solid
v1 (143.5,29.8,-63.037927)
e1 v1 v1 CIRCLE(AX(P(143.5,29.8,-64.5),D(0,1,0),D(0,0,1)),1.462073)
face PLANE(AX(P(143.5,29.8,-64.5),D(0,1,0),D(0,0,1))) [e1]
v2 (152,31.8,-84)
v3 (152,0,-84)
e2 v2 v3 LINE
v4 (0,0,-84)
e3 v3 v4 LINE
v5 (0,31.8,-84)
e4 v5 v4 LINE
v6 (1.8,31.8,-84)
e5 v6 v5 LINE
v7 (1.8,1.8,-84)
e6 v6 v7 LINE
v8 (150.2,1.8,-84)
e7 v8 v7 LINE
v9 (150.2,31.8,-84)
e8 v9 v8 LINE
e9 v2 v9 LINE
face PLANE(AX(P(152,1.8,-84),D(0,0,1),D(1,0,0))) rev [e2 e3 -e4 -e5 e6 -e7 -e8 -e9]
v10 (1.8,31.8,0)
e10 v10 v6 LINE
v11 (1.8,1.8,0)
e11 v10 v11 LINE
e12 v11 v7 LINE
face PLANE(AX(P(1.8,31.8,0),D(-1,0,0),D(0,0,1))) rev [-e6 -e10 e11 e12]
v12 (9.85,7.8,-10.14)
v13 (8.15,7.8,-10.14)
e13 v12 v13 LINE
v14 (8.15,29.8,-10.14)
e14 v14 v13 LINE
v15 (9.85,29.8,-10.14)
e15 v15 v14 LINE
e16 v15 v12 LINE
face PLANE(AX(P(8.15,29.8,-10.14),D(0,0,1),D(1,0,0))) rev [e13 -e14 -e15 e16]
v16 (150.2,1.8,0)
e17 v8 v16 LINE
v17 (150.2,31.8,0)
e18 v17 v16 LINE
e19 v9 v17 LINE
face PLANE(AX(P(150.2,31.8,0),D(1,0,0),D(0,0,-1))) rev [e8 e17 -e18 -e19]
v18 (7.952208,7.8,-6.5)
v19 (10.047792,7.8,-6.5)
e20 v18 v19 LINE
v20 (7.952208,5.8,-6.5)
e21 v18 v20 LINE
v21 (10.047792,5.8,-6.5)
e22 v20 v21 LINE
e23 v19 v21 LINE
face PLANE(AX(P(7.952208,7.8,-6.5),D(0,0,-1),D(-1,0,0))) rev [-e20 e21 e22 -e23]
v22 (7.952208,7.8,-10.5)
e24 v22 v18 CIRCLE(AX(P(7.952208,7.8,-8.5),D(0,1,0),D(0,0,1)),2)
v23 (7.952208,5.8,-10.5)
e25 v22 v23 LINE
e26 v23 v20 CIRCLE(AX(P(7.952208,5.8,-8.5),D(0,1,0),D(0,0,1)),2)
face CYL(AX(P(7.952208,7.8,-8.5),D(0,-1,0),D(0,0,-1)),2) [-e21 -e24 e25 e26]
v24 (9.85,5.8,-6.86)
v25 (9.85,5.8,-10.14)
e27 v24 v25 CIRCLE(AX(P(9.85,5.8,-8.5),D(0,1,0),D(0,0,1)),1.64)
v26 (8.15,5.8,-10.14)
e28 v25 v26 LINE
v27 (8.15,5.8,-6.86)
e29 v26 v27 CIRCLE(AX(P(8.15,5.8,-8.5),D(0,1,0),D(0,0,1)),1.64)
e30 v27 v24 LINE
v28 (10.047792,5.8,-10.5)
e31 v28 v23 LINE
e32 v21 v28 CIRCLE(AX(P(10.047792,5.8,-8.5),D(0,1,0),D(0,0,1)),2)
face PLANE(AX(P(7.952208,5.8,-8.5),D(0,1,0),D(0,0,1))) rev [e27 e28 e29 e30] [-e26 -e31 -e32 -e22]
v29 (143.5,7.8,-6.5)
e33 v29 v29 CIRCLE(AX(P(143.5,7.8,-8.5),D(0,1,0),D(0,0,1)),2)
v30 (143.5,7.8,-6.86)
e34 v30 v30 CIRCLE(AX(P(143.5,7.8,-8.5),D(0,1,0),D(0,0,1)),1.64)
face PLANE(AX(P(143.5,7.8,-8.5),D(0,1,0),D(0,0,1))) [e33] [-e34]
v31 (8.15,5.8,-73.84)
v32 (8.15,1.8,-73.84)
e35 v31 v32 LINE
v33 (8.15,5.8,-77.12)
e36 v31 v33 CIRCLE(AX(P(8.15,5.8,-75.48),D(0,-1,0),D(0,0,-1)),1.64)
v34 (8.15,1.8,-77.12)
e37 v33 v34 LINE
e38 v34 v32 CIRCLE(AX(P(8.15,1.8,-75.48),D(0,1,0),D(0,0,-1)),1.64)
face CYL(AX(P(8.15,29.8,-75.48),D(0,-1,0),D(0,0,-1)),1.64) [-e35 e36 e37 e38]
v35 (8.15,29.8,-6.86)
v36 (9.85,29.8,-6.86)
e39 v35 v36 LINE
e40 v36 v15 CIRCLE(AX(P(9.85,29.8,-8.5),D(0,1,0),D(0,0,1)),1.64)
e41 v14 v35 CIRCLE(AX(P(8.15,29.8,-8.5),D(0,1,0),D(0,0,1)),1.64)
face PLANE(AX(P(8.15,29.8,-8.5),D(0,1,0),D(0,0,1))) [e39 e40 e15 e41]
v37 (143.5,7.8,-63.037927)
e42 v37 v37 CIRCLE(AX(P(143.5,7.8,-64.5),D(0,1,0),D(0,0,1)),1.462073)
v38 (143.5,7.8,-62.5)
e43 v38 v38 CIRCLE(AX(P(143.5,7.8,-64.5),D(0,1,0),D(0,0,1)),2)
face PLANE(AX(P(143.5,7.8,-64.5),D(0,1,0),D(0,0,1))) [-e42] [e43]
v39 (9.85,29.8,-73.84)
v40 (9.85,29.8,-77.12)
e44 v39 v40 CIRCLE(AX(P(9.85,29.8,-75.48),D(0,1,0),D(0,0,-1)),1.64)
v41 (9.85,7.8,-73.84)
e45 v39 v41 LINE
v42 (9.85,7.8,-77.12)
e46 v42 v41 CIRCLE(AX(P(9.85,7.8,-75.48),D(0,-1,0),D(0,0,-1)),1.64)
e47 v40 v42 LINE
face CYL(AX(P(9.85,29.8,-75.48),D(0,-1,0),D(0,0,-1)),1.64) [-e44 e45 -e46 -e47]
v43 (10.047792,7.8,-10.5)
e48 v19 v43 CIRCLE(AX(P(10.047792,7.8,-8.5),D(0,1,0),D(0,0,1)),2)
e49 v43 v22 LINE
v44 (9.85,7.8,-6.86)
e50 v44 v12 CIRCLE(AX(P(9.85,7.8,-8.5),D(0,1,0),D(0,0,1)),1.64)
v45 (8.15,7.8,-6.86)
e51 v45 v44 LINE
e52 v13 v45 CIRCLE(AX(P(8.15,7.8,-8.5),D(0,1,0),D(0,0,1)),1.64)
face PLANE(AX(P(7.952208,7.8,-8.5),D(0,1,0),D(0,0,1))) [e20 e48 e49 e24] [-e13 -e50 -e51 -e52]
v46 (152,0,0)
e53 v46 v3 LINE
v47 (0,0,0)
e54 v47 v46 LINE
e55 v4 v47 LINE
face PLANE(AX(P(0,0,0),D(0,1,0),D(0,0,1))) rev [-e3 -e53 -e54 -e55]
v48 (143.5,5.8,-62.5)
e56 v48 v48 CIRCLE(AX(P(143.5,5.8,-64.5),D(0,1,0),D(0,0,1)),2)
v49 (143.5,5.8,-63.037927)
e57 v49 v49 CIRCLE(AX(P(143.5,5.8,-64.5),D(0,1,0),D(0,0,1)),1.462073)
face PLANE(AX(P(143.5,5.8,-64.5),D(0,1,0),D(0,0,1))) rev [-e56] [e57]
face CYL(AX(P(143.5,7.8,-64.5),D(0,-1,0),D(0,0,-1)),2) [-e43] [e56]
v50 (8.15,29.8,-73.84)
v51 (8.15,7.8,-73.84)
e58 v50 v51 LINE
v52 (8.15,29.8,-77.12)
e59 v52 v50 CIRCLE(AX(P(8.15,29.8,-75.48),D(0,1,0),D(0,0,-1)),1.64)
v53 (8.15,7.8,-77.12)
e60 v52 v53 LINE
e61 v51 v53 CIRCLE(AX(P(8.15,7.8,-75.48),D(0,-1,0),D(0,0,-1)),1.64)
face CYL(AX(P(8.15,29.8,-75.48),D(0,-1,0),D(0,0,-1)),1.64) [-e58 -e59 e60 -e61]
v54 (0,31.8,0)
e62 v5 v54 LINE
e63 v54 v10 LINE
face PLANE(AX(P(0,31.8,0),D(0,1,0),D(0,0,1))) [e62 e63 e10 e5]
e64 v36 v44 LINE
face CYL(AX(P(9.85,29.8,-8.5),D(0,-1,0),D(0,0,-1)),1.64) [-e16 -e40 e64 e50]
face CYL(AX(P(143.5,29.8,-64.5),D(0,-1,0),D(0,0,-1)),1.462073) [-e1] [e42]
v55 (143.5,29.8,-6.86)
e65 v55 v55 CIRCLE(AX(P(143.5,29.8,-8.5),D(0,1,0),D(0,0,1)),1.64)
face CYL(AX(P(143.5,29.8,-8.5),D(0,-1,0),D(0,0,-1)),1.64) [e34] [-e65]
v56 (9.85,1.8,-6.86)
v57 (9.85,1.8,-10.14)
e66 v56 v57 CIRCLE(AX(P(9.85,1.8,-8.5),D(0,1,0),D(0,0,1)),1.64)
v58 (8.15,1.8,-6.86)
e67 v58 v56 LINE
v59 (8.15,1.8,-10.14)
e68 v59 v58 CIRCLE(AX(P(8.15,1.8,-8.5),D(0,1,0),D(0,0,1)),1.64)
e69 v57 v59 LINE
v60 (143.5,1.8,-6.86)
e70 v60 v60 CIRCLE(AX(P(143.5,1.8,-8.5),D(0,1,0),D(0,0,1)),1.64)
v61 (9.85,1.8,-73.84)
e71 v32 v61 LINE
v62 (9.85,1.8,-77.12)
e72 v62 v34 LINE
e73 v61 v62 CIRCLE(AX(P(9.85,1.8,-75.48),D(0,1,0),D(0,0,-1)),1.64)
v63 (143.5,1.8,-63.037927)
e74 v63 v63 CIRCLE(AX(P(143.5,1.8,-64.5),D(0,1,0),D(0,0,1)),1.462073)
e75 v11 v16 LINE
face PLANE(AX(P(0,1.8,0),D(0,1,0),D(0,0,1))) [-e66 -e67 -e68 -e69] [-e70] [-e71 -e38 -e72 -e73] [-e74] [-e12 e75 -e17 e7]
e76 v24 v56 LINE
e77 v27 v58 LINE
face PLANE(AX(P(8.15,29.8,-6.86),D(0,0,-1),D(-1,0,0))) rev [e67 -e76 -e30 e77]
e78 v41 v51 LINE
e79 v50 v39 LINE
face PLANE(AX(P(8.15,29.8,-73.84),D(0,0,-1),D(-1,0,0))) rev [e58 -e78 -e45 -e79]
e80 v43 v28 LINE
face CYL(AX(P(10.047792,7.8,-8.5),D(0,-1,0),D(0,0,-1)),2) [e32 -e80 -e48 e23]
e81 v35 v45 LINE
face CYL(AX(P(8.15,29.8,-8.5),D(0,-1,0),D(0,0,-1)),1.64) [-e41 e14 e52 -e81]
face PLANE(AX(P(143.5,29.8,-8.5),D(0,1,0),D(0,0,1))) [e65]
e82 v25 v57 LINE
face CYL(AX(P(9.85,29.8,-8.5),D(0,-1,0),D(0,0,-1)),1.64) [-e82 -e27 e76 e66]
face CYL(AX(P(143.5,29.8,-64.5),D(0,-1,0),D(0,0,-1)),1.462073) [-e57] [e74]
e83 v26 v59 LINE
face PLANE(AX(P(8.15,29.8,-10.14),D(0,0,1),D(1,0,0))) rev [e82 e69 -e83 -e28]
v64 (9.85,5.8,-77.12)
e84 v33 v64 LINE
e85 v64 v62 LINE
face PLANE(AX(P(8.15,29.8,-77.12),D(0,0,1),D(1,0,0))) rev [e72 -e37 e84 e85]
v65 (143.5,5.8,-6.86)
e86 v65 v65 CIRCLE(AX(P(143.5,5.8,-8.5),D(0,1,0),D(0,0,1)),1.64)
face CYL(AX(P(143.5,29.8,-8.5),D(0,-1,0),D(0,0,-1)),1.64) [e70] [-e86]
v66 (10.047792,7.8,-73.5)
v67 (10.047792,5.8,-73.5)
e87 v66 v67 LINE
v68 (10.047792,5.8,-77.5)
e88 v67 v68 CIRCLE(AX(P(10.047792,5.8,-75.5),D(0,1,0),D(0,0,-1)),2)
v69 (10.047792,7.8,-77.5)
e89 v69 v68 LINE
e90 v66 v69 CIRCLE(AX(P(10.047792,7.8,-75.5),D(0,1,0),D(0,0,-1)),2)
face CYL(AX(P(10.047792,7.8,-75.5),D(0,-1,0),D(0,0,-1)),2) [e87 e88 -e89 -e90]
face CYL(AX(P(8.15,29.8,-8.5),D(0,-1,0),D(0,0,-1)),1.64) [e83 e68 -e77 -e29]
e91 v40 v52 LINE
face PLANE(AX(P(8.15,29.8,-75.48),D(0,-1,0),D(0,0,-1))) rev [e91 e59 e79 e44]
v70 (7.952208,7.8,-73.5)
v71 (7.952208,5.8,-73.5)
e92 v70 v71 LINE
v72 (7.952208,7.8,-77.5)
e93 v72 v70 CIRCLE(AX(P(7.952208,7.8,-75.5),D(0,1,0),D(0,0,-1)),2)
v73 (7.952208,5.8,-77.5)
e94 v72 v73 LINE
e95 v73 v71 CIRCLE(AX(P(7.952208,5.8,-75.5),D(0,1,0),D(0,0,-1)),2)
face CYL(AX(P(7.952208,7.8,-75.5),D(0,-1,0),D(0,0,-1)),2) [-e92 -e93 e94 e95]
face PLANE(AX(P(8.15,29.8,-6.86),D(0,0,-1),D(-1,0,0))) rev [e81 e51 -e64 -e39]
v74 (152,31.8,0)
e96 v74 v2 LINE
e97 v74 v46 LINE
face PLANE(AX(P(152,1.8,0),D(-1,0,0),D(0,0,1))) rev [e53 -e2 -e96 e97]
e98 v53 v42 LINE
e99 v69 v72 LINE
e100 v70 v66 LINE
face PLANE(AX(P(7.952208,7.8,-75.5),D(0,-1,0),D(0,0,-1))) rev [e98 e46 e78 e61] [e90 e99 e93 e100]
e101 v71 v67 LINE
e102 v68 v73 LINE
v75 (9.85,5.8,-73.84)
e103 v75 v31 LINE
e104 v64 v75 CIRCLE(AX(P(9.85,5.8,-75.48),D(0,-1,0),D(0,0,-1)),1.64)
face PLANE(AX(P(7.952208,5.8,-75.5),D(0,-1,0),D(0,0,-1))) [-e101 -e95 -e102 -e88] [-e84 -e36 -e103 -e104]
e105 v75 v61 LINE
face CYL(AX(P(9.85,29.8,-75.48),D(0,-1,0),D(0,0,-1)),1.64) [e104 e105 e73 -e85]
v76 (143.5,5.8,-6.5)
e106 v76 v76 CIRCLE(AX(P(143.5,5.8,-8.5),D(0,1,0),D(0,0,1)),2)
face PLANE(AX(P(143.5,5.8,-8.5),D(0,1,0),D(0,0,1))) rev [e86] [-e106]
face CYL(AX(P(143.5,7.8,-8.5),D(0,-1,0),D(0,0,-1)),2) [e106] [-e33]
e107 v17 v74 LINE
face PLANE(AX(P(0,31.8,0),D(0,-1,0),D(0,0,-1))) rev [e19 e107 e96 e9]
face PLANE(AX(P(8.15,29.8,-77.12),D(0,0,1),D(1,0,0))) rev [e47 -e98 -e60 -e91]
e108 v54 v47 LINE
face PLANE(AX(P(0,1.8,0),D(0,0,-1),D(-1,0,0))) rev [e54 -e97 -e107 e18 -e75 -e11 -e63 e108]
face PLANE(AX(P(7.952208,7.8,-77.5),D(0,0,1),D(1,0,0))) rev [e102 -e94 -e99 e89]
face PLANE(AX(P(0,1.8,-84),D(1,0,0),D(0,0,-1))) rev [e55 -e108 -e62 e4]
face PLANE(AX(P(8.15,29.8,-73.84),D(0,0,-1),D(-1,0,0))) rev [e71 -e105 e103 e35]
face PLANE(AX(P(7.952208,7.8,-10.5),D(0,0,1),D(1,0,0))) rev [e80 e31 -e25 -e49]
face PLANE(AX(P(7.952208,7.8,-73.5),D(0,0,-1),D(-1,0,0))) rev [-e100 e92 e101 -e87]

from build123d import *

# Parameters (mm, degrees)
SKETCH_1_W      = 152
SKETCH_1_H      = 84
EXTRUDE_1_DEPTH = 1.8
SKETCH_3_R      = 1.64
SKETCH_3_R_2    = 1.462072503
EXTRUDE_2_DEPTH = 28
SKETCH_3_2_R    = 1.64
SKETCH_3_2_R_2  = 1.462072503
EXTRUDE_3_DEPTH = 4.5
EXTRUDE_START   = -24
SKETCH_4_R      = 2
EXTRUDE_4_DEPTH = 2
SKETCH_10_W     = 1.8
SKETCH_10_H     = 84
EXTRUDE_6_DEPTH = 30


with BuildPart() as part:
    # 草图1 → 凸台-拉伸1 (new body)
    with BuildSketch(Plane(origin=(0, 0, 0), x_dir=(1, 0, 0), z_dir=(0, 1, 0))):
        with Locations((76, 42)):
            Rectangle(SKETCH_1_W, SKETCH_1_H)
    extrude(amount=EXTRUDE_1_DEPTH)

    # 草图3 → 凸台-拉伸2 (add)
    with BuildSketch(Plane(origin=(0, 1.8, 0), x_dir=(1, 0, 0), z_dir=(0, 1, 0))):
        with Locations((143.5, 8.5)):
            Circle(SKETCH_3_R)
        with Locations((143.5, 64.5)):
            Circle(SKETCH_3_R_2)
        with BuildLine():
            Line((8.15, 10.14), (9.85, 10.14))
            ThreePointArc((9.85, 10.14), (11.49, 8.5), (9.85, 6.86))
            Line((9.85, 6.86), (8.15, 6.86))
            ThreePointArc((8.15, 6.86), (6.51, 8.5), (8.15, 10.14))
        make_face()
        with BuildLine():
            Line((8.15, 73.84), (9.85, 73.84))
            ThreePointArc((9.85, 73.84), (11.49, 75.48), (9.85, 77.12))
            Line((9.85, 77.12), (8.15, 77.12))
            ThreePointArc((8.15, 77.12), (6.51, 75.48), (8.15, 73.84))
        make_face()
    extrude(amount=EXTRUDE_2_DEPTH)

    # 草图3<2> → 凸台-拉伸3 (add)
    with BuildSketch(Plane(origin=(0, 1.8, 0), x_dir=(1, 0, 0), z_dir=(0, 1, 0))):
        with Locations((143.5, 8.5)):
            Circle(SKETCH_3_2_R)
        with Locations((143.5, 64.5)):
            Circle(SKETCH_3_2_R_2)
        with BuildLine():
            Line((8.15, 10.14), (9.85, 10.14))
            ThreePointArc((9.85, 10.14), (11.49, 8.5), (9.85, 6.86))
            Line((9.85, 6.86), (8.15, 6.86))
            ThreePointArc((8.15, 6.86), (6.51, 8.5), (8.15, 10.14))
        make_face()
        with BuildLine():
            Line((8.15, 73.84), (9.85, 73.84))
            ThreePointArc((9.85, 73.84), (11.49, 75.48), (9.85, 77.12))
            Line((9.85, 77.12), (8.15, 77.12))
            ThreePointArc((8.15, 77.12), (6.51, 75.48), (8.15, 73.84))
        make_face()
    extrude(amount=EXTRUDE_3_DEPTH)

    # 草图4 → 凸台-拉伸4 (add)
    with BuildSketch(Plane(origin=(0, 29.8, 0), x_dir=(1, 0, 0), z_dir=(0, 1, 0)).offset(EXTRUDE_START)):
        with Locations((143.5, 64.5)):
            Circle(SKETCH_4_R)
        with Locations((143.5, 8.5)):
            Circle(SKETCH_4_R)
        with BuildLine():
            Line((7.952208314, 10.5), (10.047791686, 10.5))
            ThreePointArc((10.047791686, 10.5), (12.047791686, 8.5), (10.047791686, 6.5))
            Line((10.047791686, 6.5), (7.952208314, 6.5))
            ThreePointArc((7.952208314, 6.5), (5.952208314, 8.5), (7.952208314, 10.5))
        make_face()
        with BuildLine():
            Line((7.952208314, 73.5), (10.047791686, 73.5))
            ThreePointArc((10.047791686, 73.5), (12.047791686, 75.5), (10.047791686, 77.5))
            Line((10.047791686, 77.5), (7.952208314, 77.5))
            ThreePointArc((7.952208314, 77.5), (5.952208314, 75.5), (7.952208314, 73.5))
        make_face()
    extrude(amount=EXTRUDE_4_DEPTH)

    # 草图10 → 凸台-拉伸6 (add)
    with BuildSketch(Plane(origin=(0, 1.8, 0), x_dir=(1, 0, 0), z_dir=(0, 1, 0))):
        with Locations((0.9, 42)):
            Rectangle(SKETCH_10_W, SKETCH_10_H)
        with Locations((151.1, 42)):
            Rectangle(SKETCH_10_W, SKETCH_10_H)
    extrude(amount=EXTRUDE_6_DEPTH)


solid = part.part
